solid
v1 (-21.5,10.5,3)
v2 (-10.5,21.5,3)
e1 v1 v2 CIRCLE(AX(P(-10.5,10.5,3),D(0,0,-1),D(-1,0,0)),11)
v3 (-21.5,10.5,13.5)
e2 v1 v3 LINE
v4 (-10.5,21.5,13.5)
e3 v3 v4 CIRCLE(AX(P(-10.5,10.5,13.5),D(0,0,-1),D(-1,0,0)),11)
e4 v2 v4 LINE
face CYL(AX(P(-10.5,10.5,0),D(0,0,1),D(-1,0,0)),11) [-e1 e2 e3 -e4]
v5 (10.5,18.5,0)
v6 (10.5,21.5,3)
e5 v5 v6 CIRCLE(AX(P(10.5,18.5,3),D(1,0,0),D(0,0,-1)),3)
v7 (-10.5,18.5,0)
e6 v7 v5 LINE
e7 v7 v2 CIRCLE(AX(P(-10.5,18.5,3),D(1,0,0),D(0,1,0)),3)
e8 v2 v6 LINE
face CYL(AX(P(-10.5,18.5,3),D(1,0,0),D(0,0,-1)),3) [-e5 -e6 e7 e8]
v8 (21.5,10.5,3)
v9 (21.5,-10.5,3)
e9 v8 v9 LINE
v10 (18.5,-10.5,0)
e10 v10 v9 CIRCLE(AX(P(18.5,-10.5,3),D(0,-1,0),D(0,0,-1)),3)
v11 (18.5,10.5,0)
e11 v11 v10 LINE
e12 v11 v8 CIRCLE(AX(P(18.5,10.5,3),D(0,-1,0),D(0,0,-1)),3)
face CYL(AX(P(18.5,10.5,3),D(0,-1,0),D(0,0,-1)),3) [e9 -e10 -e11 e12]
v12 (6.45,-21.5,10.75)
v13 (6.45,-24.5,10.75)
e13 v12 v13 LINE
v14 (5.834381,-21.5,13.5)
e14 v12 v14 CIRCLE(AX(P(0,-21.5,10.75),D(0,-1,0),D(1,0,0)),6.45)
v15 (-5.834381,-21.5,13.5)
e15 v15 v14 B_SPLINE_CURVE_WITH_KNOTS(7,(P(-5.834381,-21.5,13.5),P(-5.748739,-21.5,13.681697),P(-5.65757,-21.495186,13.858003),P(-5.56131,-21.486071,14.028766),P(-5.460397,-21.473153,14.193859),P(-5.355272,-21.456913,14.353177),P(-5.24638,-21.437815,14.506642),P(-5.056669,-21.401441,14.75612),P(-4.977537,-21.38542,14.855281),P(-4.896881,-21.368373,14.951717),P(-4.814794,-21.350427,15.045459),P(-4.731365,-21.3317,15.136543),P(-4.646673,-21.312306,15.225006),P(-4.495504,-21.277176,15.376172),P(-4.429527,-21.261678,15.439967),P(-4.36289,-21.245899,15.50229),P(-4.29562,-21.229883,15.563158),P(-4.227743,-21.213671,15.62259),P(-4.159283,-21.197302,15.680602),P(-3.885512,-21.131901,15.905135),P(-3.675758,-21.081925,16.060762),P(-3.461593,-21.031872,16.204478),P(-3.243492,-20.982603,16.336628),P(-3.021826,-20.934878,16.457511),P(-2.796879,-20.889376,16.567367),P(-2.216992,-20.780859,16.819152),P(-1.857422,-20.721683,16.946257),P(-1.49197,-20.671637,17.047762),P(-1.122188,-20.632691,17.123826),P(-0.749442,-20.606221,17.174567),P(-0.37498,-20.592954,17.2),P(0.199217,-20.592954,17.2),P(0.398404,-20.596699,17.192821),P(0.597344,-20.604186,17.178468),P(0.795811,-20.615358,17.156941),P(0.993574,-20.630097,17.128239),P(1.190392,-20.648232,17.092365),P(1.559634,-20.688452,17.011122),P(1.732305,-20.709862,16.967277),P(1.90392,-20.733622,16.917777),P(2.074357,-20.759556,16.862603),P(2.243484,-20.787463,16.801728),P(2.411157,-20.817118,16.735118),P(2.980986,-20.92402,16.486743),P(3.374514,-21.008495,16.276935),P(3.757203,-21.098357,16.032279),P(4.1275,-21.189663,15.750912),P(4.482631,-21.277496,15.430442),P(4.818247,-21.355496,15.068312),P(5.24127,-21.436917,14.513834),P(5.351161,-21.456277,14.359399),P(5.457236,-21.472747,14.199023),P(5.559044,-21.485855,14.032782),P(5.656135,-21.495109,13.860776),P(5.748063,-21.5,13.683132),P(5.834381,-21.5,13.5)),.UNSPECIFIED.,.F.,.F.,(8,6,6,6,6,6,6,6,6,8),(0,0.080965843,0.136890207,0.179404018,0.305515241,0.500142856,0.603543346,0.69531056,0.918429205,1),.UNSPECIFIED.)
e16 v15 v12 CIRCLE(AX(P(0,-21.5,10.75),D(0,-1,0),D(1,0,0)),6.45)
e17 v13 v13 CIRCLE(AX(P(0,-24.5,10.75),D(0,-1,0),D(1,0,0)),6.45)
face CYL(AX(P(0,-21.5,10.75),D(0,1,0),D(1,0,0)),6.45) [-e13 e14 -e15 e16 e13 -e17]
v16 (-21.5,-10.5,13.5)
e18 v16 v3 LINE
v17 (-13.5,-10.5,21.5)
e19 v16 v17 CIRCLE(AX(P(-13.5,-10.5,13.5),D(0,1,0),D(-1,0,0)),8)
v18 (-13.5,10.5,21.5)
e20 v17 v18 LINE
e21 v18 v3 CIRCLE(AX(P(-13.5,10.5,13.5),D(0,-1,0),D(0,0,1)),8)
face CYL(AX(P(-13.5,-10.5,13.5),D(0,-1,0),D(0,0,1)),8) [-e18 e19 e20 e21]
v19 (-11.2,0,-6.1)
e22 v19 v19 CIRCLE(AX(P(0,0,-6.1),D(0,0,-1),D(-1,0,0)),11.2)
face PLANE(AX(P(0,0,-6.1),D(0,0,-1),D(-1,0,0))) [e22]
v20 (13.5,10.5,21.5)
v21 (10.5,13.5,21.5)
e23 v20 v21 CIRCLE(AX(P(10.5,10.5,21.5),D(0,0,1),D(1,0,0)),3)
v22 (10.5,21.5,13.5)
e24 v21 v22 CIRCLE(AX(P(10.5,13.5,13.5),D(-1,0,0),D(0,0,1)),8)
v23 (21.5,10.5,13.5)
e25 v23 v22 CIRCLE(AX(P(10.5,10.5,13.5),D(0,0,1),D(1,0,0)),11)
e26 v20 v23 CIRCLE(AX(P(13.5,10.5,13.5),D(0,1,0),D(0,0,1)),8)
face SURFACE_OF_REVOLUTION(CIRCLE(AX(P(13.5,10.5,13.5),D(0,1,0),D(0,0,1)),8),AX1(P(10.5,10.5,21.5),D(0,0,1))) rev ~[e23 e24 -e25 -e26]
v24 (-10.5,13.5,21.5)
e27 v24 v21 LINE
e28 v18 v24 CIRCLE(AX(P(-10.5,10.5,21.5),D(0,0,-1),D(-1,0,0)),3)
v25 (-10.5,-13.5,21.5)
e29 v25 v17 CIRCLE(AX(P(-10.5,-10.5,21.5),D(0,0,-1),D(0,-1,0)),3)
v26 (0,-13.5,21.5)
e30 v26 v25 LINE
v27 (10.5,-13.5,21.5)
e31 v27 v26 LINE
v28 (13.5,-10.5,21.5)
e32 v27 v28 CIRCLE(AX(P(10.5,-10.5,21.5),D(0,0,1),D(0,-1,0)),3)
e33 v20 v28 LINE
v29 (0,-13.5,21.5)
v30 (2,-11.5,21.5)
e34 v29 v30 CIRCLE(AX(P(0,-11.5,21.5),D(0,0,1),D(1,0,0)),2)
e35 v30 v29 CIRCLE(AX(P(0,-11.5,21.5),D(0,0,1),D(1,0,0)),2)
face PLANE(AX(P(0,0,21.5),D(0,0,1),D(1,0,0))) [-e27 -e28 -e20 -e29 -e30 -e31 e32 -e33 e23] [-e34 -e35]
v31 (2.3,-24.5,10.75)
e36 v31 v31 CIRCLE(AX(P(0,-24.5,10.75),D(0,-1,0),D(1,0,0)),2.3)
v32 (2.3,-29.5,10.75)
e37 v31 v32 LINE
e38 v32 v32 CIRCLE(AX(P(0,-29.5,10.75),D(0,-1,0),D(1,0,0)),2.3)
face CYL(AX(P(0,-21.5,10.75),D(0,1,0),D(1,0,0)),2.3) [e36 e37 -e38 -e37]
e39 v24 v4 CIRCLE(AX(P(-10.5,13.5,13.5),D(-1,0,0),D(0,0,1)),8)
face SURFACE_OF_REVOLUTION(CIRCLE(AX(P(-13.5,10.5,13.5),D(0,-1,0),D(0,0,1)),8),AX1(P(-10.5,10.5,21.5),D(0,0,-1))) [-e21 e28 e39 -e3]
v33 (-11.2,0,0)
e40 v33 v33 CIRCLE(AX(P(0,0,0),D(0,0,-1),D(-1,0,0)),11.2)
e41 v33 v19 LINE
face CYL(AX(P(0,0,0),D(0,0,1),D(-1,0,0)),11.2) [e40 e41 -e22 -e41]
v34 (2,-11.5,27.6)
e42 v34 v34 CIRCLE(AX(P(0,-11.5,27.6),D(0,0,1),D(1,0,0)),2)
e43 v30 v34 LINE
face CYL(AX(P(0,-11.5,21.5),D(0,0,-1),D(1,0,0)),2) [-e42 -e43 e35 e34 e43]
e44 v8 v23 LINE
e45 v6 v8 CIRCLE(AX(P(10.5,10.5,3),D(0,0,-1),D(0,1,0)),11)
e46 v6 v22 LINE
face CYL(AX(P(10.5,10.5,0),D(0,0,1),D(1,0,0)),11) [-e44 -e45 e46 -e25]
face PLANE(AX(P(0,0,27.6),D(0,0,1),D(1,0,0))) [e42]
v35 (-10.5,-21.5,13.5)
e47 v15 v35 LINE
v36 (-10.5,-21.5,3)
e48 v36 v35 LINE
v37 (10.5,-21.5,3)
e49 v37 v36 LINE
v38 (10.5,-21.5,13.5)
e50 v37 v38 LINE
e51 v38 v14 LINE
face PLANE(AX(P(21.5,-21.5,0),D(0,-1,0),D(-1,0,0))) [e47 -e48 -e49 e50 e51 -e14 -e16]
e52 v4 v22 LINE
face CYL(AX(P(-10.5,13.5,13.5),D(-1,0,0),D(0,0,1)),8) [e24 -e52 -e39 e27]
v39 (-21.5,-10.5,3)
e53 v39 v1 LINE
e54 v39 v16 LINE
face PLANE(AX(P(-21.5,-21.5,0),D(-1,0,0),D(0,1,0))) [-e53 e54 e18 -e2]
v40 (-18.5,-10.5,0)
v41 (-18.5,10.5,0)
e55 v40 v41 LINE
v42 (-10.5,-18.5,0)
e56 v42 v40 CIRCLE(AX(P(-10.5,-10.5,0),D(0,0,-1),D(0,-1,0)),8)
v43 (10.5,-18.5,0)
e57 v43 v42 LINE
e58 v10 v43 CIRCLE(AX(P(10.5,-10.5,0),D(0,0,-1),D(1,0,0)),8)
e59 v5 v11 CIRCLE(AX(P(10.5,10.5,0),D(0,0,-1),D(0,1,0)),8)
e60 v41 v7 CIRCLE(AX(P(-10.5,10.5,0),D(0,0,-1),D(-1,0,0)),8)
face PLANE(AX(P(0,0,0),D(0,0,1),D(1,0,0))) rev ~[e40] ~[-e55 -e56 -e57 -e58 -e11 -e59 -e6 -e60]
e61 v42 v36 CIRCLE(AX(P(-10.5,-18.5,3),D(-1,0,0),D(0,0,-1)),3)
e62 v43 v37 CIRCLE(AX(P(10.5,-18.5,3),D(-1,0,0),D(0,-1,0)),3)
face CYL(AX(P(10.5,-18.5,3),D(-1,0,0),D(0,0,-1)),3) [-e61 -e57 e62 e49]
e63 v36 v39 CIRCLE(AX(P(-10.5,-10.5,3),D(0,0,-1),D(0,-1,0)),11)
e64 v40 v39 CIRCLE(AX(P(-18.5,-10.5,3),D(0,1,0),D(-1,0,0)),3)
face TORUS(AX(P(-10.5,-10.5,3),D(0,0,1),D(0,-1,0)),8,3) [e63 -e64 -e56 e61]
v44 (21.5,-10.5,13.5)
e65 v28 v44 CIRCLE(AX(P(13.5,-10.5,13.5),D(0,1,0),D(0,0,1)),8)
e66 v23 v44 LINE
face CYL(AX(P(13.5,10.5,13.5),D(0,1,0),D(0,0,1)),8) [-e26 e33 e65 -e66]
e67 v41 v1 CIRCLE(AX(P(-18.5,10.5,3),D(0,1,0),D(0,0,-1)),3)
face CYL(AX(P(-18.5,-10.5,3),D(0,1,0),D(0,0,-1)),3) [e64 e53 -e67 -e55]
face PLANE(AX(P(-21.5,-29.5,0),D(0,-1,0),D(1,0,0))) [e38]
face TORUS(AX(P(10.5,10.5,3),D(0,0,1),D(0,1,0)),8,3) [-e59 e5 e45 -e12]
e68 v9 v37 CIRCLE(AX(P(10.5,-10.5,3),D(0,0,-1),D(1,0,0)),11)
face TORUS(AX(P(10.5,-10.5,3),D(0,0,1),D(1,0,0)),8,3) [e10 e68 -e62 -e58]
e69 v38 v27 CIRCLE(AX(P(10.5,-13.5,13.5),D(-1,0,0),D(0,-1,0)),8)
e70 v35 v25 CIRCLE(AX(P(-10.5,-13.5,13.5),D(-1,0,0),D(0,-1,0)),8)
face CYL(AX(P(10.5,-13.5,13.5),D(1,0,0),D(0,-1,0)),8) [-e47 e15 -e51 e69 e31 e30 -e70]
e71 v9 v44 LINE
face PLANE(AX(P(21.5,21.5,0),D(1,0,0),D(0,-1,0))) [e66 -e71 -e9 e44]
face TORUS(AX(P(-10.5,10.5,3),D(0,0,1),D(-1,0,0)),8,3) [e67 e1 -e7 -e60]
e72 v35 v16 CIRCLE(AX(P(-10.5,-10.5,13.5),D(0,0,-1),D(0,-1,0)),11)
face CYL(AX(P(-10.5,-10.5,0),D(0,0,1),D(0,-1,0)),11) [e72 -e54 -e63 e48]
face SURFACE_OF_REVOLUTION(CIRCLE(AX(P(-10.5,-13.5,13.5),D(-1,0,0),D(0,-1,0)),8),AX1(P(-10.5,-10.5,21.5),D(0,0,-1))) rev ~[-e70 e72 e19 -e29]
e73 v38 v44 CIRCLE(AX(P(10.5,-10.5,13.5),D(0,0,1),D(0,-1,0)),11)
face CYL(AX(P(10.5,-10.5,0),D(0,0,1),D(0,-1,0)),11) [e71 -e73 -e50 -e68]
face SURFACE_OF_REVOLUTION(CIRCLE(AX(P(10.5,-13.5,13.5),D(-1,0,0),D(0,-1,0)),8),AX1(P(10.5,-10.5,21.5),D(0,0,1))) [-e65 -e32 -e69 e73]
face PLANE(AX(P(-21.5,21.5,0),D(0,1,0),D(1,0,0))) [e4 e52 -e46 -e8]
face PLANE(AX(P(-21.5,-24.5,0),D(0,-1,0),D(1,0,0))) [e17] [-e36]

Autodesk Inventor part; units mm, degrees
ref_plane "YZ Plane" through (0, 0, 0) normal (1, 0, 0) x (0, 1, 0)
ref_plane "XZ Plane" through (0, 0, 0) normal (0, 1, 0) x (-1, 0, 0)
ref_plane "XY Plane" through (0, 0, 0) normal (0, 0, 1) x (1, 0, 0)
sketch "스케치1" plane through (0, 0, 0) normal (0, 0, 1) x (1, 0, 0)
  line L0 (21.5, -21.5) -> (-21.5, -21.5)
  line L1 (-21.5, -21.5) -> (-21.5, 21.5)
  line L2 (-21.5, 21.5) -> (21.5, 21.5)
  line L3 (21.5, 21.5) -> (21.5, -21.5)
  line L4 (21.5, -21.5) -> (-21.5, 21.5) construction
  line L5 (-21.5, -21.5) -> (21.5, 21.5) construction
  point P0 (0, 0)
  dimension "d0" = 43
  dimension "d1" = 43
extrude "돌출1" add sketch "스케치1" along normal blind 21.5
sketch "스케치2" plane through (0, 0, 0) normal (0, 0, -1) x (-1, 0, 0)
  circle A0 centre (0, 0) radius 11.2
  dimension "d4" = 22.4
extrude "돌출2" add sketch "스케치2" along normal blind 6.1
sketch "스케치3" plane through (0, 0, 21.5) normal (0, 0, 1) x (1, 0, 0)
  line L0 (-21.5, -21.5) -> (21.5, -21.5) projected
  circle A0 centre (0, -11.5) radius 2
  point P0 (0, 0)
  dimension "d7" = 4
  dimension "d8" = 10
extrude "돌출3" add sketch "스케치3" along normal blind 6.1
sketch "스케치4" plane through (-21.5, -21.5, 0) normal (0, -1, 0) x (1, 0, 0)
  line L0 (43, 0) -> (43, 21.5) projected
  line L1 (0, 21.5) -> (43, 21.5) projected
  line L2 (0, 0) -> (0, 21.5) projected
  line L3 (43, 10.75) -> (0, 10.75) construction
  line L4 (21.5, 0) -> (21.5, 21.5) construction
  circle A0 centre (21.5, 10.75) radius 6.45
  circle A1 centre (21.5, 10.75) radius 2.3
  dimension "d11" = 12.9
  dimension "d12" = 4.6
extrude "돌출4" add sketch "스케치4" along normal blind 8 contours A1
extrude "돌출5" add sketch "스케치4" along normal blind 3
fillet "모깎기1" radius 11 4 edges at (-21.5, -21.5, 10.75) (21.5, -21.5, 10.75) (-21.5, 21.5, 10.75) (21.5, 21.5, 10.75)
fillet "모깎기2" radius 8 8 edges at (0, -21.5, 21.5) (-18.2782, -18.2782, 21.5) (-21.5, 0, 21.5) (-18.2782, 18.2782, 21.5) (0, 21.5, 21.5) (18.2782, 18.2782, 21.5) (21.5, 0, 21.5) (18.2782, -18.2782, 21.5)
fillet "모깎기3" radius 3 8 edges at (21.5, 0, 0) (18.2782, 18.2782, 0) (0, 21.5, 0) (-18.2782, 18.2782, 0) (-21.5, 0, 0) (-18.2782, -18.2782, 0) (0, -21.5, 0) (18.2782, -18.2782, 0)
equation "\"d1\" = d0"
properties part number "camera" material "고무, 검은색"
